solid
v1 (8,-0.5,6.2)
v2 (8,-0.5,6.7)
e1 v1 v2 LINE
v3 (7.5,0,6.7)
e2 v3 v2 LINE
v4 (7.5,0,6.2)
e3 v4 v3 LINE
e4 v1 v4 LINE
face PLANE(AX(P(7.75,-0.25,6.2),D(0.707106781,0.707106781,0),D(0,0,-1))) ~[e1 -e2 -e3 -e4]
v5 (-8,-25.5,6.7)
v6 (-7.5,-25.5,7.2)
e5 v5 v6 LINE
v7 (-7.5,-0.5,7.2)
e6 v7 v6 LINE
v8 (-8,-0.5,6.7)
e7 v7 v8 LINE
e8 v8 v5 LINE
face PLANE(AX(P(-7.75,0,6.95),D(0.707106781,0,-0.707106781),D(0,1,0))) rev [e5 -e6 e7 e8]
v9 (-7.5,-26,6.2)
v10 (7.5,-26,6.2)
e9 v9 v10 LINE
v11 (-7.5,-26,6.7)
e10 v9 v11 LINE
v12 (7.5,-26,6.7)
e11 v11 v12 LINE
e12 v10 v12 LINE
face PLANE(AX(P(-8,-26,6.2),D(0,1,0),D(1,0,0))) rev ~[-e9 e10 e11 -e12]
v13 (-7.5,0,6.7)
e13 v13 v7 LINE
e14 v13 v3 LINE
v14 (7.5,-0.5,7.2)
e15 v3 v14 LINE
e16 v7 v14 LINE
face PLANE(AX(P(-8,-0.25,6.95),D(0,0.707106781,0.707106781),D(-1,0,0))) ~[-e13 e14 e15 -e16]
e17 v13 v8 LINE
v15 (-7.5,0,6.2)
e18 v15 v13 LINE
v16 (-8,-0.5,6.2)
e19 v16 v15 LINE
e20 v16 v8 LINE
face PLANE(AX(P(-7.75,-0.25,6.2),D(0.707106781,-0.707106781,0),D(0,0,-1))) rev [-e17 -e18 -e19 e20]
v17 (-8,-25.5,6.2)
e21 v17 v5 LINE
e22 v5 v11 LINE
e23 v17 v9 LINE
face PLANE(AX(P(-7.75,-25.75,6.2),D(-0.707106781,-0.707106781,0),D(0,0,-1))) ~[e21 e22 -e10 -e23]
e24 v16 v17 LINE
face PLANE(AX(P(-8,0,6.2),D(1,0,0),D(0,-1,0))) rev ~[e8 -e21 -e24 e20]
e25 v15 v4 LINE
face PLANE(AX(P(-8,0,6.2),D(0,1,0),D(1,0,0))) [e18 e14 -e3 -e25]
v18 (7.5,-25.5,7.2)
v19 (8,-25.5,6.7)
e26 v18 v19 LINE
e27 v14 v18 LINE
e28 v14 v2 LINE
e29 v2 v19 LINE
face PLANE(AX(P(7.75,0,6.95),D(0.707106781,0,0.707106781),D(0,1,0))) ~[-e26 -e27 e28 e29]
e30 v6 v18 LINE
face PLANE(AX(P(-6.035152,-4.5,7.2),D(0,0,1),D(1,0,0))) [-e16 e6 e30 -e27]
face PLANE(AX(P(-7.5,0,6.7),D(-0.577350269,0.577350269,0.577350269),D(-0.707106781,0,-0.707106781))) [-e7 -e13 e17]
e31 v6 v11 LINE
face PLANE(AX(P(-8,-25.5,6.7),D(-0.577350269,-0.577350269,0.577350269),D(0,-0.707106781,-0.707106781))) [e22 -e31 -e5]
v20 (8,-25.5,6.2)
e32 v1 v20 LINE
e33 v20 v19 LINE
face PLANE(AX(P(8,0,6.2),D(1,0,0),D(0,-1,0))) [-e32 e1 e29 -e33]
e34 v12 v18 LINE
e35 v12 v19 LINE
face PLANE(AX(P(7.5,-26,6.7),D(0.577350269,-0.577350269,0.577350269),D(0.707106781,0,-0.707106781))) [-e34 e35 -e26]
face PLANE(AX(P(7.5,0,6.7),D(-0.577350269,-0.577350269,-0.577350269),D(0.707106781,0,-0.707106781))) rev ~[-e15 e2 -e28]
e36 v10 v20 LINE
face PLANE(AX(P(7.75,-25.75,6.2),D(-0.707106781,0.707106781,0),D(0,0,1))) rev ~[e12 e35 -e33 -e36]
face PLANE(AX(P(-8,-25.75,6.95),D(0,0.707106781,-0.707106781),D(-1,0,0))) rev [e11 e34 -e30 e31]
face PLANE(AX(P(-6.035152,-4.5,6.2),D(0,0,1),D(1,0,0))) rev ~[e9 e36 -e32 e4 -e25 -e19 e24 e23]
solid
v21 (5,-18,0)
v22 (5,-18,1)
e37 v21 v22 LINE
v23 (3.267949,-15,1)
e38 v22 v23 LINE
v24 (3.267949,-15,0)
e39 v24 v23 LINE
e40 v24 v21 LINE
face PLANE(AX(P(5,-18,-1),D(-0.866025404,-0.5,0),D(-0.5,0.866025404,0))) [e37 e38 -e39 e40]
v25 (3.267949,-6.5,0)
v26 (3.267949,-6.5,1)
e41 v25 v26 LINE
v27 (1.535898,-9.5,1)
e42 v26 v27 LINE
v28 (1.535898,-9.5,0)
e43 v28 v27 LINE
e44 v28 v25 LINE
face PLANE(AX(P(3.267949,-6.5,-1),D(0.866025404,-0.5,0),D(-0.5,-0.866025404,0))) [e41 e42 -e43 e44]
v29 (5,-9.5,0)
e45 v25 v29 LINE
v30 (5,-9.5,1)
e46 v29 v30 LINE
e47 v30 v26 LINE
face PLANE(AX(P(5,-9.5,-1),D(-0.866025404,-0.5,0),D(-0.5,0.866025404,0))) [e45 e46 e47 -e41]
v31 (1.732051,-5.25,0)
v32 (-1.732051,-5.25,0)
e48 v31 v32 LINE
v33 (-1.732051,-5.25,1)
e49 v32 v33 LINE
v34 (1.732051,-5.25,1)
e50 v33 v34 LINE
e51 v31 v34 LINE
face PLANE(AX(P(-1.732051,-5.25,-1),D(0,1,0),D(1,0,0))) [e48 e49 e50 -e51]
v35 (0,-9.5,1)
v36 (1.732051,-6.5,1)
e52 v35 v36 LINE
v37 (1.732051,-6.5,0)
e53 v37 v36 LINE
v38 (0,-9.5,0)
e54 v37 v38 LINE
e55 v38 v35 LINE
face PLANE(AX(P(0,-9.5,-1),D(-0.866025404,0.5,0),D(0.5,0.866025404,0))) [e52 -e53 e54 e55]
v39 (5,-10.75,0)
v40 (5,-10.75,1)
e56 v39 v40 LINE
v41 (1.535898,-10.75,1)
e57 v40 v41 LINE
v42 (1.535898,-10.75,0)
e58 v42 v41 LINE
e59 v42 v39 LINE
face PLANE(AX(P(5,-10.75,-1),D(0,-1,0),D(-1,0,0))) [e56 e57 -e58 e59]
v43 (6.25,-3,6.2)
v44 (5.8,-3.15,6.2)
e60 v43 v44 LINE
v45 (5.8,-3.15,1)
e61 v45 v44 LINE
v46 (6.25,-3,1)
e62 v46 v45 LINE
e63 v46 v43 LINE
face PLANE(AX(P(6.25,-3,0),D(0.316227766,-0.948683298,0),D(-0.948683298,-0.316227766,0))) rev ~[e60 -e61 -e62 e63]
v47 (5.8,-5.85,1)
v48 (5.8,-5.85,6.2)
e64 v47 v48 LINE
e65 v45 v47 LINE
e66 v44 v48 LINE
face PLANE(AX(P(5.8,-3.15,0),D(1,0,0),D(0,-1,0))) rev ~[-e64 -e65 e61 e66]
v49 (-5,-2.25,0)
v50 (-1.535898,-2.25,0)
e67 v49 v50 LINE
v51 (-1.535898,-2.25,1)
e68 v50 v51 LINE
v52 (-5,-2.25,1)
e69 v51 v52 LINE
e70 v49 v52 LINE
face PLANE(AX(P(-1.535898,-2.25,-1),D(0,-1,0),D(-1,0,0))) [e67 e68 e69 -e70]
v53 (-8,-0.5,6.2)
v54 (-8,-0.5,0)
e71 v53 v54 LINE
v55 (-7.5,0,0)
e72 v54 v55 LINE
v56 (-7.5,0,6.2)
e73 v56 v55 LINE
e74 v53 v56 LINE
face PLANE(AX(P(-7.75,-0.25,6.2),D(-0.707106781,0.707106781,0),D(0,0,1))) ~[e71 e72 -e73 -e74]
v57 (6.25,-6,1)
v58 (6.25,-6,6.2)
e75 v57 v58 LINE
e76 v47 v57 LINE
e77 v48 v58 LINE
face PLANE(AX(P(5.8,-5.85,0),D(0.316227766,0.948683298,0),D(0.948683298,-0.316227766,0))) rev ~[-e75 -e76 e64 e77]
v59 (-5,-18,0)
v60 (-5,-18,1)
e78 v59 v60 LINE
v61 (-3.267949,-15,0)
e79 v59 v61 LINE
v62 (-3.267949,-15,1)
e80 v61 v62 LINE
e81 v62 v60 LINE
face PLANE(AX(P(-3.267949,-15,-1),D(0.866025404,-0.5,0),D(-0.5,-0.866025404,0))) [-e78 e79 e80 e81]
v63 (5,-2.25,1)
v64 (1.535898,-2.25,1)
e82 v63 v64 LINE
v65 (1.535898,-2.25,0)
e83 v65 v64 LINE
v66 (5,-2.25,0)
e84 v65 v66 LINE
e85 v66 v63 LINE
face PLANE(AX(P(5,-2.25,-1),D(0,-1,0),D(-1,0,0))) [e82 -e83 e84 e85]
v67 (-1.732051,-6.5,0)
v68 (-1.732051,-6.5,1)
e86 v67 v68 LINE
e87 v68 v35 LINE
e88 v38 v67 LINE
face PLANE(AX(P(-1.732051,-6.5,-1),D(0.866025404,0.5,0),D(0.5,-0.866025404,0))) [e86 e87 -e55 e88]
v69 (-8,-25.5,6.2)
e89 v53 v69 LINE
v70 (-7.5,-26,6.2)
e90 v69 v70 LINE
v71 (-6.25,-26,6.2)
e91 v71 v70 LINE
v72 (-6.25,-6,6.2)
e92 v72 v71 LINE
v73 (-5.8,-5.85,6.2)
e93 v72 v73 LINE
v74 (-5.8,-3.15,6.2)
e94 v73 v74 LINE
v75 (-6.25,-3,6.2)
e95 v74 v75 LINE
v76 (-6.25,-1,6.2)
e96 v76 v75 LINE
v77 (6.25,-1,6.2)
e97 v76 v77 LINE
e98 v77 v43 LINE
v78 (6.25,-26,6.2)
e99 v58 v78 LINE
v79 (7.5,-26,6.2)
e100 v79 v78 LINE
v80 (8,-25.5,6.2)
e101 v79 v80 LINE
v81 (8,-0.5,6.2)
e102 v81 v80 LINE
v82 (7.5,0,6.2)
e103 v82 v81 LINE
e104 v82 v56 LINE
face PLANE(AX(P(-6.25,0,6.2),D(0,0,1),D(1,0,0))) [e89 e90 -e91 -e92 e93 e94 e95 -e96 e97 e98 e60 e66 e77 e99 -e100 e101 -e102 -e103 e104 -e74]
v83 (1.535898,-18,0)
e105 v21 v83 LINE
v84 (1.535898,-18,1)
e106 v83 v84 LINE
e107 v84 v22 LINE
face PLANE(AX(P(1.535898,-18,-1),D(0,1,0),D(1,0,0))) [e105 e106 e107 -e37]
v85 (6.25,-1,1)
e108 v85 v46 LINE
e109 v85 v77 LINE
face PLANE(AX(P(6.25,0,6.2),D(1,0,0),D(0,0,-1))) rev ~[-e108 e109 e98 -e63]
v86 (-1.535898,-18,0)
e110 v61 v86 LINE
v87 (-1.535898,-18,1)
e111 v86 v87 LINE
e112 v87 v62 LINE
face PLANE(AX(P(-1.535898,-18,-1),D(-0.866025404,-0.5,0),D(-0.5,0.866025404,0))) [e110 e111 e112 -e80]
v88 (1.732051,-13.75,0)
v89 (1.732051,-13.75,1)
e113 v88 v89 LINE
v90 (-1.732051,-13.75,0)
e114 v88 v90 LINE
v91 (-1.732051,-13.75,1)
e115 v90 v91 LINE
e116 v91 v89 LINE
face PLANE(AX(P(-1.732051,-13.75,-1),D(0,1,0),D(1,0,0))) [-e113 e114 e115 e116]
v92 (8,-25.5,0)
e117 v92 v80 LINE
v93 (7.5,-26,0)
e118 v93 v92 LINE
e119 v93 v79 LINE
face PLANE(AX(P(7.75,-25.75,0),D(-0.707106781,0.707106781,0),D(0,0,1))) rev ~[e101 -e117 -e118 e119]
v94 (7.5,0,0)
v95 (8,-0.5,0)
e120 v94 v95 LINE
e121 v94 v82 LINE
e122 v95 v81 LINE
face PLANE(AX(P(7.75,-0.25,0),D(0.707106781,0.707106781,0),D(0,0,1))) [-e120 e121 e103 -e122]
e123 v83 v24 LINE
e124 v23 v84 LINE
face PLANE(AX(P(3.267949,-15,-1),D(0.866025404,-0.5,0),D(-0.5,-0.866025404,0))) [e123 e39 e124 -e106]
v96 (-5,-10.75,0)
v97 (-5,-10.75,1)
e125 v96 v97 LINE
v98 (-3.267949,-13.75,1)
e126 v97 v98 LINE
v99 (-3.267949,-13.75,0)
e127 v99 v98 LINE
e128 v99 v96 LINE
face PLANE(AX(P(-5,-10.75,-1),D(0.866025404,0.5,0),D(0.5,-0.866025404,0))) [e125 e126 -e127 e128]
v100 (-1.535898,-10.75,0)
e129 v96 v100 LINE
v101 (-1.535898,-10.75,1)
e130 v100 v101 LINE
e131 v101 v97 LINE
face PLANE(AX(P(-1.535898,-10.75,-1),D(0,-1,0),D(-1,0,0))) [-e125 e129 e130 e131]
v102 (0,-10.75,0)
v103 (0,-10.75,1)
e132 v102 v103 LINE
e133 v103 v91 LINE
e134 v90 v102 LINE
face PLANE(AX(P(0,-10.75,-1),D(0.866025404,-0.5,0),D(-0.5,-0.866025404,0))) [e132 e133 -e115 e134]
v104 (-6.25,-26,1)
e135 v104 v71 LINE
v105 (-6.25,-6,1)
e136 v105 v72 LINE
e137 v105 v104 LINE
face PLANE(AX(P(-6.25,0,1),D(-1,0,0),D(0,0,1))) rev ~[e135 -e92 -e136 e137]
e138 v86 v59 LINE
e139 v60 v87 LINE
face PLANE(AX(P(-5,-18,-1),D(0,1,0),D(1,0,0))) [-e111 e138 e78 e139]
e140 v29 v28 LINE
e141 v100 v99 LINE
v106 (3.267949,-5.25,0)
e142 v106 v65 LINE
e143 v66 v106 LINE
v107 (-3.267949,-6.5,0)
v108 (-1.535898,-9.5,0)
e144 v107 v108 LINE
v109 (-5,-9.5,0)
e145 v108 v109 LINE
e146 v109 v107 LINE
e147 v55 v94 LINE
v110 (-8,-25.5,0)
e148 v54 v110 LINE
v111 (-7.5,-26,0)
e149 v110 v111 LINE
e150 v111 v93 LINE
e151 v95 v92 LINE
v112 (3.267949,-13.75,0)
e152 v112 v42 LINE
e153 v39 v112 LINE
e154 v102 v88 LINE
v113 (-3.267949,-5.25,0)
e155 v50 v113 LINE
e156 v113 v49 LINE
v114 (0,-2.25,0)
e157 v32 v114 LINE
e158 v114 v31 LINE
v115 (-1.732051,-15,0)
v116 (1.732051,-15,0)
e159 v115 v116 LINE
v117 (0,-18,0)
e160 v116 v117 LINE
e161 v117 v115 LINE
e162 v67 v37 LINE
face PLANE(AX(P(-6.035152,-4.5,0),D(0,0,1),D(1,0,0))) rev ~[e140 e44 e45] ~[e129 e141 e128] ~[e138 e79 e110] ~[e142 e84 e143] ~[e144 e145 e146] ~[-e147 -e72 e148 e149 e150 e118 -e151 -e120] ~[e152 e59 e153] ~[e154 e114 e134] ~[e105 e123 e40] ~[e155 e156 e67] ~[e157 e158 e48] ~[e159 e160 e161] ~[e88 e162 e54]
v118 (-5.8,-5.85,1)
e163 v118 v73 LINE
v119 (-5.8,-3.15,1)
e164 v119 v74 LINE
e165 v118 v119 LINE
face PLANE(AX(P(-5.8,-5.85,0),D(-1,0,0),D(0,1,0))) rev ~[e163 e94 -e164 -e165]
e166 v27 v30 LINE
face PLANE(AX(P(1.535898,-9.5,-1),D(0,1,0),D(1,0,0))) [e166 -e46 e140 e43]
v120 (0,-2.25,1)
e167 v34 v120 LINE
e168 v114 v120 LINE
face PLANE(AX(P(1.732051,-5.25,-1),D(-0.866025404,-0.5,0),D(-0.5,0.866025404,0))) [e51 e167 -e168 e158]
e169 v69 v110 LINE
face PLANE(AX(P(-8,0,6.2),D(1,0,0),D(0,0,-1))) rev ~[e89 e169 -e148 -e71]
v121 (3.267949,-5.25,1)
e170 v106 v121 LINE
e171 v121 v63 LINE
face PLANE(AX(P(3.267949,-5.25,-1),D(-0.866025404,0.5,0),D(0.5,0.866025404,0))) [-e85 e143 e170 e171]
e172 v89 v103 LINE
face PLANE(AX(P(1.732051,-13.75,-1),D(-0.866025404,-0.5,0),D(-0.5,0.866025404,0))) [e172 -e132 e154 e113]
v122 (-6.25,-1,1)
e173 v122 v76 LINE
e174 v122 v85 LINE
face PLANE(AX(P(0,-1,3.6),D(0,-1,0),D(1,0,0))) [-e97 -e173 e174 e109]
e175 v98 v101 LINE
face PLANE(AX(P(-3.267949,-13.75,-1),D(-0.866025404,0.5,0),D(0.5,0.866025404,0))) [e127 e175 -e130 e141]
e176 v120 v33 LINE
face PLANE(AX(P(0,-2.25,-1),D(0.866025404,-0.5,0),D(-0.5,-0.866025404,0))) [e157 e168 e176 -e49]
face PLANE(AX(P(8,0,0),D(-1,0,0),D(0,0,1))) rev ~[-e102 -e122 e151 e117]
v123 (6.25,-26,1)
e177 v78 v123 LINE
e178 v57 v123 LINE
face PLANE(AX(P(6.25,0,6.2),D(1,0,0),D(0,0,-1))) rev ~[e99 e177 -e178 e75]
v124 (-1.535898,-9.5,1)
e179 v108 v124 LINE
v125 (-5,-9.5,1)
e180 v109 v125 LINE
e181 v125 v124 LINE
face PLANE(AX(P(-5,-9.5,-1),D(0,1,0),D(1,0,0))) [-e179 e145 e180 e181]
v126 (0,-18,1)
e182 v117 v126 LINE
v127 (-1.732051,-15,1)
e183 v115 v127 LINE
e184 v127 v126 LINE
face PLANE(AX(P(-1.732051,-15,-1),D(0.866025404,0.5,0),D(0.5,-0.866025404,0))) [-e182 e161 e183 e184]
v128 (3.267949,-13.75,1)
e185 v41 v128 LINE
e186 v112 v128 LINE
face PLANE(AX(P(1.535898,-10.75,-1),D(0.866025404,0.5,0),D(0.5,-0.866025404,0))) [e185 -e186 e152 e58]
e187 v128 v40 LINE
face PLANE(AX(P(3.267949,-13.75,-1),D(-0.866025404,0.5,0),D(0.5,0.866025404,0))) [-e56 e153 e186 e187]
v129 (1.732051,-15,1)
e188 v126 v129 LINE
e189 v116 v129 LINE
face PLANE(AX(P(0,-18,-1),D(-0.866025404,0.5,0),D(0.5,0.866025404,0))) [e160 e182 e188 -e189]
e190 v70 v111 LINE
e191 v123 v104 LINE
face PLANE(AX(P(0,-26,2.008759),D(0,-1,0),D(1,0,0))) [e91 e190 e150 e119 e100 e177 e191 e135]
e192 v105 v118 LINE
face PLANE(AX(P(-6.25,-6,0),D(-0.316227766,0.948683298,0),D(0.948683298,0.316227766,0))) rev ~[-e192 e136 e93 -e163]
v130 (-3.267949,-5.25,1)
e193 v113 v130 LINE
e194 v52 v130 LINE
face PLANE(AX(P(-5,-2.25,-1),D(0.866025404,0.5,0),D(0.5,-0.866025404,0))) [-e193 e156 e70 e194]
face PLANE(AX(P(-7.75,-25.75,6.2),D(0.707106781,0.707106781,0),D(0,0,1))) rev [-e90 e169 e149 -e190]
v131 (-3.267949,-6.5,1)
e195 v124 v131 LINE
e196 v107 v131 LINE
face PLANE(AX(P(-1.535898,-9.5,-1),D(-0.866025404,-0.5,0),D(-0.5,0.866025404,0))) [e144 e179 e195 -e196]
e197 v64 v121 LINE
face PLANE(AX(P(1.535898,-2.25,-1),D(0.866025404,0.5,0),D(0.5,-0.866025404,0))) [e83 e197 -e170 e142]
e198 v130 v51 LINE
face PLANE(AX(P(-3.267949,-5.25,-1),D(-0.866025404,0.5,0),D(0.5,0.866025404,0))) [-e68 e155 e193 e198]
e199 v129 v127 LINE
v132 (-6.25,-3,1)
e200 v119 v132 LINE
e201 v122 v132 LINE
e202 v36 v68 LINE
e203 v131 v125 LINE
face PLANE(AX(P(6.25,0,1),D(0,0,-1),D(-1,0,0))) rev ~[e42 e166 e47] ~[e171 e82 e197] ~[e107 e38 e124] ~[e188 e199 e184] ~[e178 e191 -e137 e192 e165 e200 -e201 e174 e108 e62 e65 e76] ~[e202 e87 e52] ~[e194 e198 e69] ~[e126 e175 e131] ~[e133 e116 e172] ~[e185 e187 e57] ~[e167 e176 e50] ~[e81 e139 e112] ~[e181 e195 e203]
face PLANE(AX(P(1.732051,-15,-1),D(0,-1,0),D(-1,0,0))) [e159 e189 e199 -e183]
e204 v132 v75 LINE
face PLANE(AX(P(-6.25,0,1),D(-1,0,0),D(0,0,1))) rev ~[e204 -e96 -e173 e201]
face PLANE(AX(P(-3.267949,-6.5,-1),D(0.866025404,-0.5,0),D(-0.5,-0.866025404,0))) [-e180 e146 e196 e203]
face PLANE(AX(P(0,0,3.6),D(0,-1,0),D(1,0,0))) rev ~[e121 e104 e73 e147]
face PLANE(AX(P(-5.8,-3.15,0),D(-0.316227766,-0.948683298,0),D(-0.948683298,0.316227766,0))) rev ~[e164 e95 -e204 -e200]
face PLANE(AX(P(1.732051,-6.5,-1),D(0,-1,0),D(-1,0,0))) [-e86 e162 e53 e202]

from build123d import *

# Parameters (mm, degrees)
F3_DEPTH  = 26
F1_W      = 12.5
F1_H      = 5.2
F4_DEPTH  = 1
F5_DEPTH  = 6.2
F7_DEPTH  = 1
F9_SIZE   = 0.5
F9_2_SIZE = 0.5
F10_DEPTH = 25


with BuildPart() as f3:
    # F1 (on Front) → F3 (new body)
    with BuildSketch(Plane.XZ):
        Polygon((-6.25, 1), (-6.25, 6.2), (-8, 6.2), (-8, 0), (8, 0), (8, 6.2), (6.25, 6.2), (6.25, 1), align=None)
    extrude(amount=F3_DEPTH)

    # F1 (on Front) → F4 (join)
    with BuildSketch(Plane.XZ):
        with Locations((0, 3.6)):
            Rectangle(F1_W, F1_H)
    extrude(amount=F4_DEPTH)

    # F2 (on Top) → F5 (join)
    with BuildSketch(Plane.XY):
        Polygon((-5.8, -3.15), (-6.25, -3), (-6.25, -6), (-5.8, -5.85), align=None)
        Polygon((5.8, -3.15), (5.8, -5.85), (6.25, -6), (6.25, -3), align=None)
    extrude(amount=F5_DEPTH)


with BuildPart() as f7:
    # F7 (new): a face of the model
    f7_faces = [f3.part.faces().sort_by_distance(p)[0] for p in [
        (0, -13, 0),
    ]]
    extrude(f7_faces, amount=-F7_DEPTH)


with BuildPart() as f7_1:
    # F8: moved
    add(f7.part.moved(Location((0, 0, 6.2))))

    # F9#2
    f9_2_edges = [f7_1.edges().sort_by_distance(p)[0] for p in [
        (8, -13, 7.2),
        (0, -26, 7.2),
        (-8, -13, 7.2),
        (0, 0, 7.2),
        (8, 0, 6.7),
        (8, -26, 6.7),
        (-8, -26, 6.7),
        (-8, 0, 6.7),
    ]]
    chamfer(f9_2_edges, length=F9_2_SIZE)


with BuildPart() as f3_1:
    add(f3.part)

    # F9
    f9_edges = [f3_1.edges().sort_by_distance(p)[0] for p in [
        (8, -26, 3.1),
        (-8, -26, 3.1),
        (-8, 0, 3.1),
        (8, 0, 3.1),
    ]]
    chamfer(f9_edges, length=F9_SIZE)

    # F6 (on offset) → F10 (cut)
    with BuildSketch(Plane.XY.offset(-1)):
        Polygon((-5, -2.25), (-3.2679491924, -5.25), (-1.5358983849, -2.25), align=None)
        Polygon((0, -2.25), (-1.7320508076, -5.25), (1.7320508076, -5.25), align=None)
        Polygon((3.2679491924, -5.25), (5, -2.25), (1.5358983849, -2.25), align=None)
        Polygon((-5, -9.5), (-1.5358983849, -9.5), (-3.2679491924, -6.5), align=None)
        Polygon((-1.7320508076, -6.5), (0, -9.5), (1.7320508076, -6.5), align=None)
        Polygon((3.2679491924, -6.5), (1.5358983849, -9.5), (5, -9.5), align=None)
        Polygon((5, -10.75), (1.5358983849, -10.75), (3.2679491924, -13.75), align=None)
        Polygon((0, -10.75), (-1.7320508076, -13.75), (1.7320508076, -13.75), align=None)
        Polygon((-5, -10.75), (-3.2679491924, -13.75), (-1.5358983849, -10.75), align=None)
        Polygon((-1.5358983849, -18), (-3.2679491924, -15), (-5, -18), align=None)
        Polygon((-1.7320508076, -15), (0, -18), (1.7320508076, -15), align=None)
        Polygon((3.2679491924, -15), (1.5358983849, -18), (5, -18), align=None)
    extrude(amount=F10_DEPTH, mode=Mode.SUBTRACT)


solid = Compound([f7_1.part, f3_1.part])
